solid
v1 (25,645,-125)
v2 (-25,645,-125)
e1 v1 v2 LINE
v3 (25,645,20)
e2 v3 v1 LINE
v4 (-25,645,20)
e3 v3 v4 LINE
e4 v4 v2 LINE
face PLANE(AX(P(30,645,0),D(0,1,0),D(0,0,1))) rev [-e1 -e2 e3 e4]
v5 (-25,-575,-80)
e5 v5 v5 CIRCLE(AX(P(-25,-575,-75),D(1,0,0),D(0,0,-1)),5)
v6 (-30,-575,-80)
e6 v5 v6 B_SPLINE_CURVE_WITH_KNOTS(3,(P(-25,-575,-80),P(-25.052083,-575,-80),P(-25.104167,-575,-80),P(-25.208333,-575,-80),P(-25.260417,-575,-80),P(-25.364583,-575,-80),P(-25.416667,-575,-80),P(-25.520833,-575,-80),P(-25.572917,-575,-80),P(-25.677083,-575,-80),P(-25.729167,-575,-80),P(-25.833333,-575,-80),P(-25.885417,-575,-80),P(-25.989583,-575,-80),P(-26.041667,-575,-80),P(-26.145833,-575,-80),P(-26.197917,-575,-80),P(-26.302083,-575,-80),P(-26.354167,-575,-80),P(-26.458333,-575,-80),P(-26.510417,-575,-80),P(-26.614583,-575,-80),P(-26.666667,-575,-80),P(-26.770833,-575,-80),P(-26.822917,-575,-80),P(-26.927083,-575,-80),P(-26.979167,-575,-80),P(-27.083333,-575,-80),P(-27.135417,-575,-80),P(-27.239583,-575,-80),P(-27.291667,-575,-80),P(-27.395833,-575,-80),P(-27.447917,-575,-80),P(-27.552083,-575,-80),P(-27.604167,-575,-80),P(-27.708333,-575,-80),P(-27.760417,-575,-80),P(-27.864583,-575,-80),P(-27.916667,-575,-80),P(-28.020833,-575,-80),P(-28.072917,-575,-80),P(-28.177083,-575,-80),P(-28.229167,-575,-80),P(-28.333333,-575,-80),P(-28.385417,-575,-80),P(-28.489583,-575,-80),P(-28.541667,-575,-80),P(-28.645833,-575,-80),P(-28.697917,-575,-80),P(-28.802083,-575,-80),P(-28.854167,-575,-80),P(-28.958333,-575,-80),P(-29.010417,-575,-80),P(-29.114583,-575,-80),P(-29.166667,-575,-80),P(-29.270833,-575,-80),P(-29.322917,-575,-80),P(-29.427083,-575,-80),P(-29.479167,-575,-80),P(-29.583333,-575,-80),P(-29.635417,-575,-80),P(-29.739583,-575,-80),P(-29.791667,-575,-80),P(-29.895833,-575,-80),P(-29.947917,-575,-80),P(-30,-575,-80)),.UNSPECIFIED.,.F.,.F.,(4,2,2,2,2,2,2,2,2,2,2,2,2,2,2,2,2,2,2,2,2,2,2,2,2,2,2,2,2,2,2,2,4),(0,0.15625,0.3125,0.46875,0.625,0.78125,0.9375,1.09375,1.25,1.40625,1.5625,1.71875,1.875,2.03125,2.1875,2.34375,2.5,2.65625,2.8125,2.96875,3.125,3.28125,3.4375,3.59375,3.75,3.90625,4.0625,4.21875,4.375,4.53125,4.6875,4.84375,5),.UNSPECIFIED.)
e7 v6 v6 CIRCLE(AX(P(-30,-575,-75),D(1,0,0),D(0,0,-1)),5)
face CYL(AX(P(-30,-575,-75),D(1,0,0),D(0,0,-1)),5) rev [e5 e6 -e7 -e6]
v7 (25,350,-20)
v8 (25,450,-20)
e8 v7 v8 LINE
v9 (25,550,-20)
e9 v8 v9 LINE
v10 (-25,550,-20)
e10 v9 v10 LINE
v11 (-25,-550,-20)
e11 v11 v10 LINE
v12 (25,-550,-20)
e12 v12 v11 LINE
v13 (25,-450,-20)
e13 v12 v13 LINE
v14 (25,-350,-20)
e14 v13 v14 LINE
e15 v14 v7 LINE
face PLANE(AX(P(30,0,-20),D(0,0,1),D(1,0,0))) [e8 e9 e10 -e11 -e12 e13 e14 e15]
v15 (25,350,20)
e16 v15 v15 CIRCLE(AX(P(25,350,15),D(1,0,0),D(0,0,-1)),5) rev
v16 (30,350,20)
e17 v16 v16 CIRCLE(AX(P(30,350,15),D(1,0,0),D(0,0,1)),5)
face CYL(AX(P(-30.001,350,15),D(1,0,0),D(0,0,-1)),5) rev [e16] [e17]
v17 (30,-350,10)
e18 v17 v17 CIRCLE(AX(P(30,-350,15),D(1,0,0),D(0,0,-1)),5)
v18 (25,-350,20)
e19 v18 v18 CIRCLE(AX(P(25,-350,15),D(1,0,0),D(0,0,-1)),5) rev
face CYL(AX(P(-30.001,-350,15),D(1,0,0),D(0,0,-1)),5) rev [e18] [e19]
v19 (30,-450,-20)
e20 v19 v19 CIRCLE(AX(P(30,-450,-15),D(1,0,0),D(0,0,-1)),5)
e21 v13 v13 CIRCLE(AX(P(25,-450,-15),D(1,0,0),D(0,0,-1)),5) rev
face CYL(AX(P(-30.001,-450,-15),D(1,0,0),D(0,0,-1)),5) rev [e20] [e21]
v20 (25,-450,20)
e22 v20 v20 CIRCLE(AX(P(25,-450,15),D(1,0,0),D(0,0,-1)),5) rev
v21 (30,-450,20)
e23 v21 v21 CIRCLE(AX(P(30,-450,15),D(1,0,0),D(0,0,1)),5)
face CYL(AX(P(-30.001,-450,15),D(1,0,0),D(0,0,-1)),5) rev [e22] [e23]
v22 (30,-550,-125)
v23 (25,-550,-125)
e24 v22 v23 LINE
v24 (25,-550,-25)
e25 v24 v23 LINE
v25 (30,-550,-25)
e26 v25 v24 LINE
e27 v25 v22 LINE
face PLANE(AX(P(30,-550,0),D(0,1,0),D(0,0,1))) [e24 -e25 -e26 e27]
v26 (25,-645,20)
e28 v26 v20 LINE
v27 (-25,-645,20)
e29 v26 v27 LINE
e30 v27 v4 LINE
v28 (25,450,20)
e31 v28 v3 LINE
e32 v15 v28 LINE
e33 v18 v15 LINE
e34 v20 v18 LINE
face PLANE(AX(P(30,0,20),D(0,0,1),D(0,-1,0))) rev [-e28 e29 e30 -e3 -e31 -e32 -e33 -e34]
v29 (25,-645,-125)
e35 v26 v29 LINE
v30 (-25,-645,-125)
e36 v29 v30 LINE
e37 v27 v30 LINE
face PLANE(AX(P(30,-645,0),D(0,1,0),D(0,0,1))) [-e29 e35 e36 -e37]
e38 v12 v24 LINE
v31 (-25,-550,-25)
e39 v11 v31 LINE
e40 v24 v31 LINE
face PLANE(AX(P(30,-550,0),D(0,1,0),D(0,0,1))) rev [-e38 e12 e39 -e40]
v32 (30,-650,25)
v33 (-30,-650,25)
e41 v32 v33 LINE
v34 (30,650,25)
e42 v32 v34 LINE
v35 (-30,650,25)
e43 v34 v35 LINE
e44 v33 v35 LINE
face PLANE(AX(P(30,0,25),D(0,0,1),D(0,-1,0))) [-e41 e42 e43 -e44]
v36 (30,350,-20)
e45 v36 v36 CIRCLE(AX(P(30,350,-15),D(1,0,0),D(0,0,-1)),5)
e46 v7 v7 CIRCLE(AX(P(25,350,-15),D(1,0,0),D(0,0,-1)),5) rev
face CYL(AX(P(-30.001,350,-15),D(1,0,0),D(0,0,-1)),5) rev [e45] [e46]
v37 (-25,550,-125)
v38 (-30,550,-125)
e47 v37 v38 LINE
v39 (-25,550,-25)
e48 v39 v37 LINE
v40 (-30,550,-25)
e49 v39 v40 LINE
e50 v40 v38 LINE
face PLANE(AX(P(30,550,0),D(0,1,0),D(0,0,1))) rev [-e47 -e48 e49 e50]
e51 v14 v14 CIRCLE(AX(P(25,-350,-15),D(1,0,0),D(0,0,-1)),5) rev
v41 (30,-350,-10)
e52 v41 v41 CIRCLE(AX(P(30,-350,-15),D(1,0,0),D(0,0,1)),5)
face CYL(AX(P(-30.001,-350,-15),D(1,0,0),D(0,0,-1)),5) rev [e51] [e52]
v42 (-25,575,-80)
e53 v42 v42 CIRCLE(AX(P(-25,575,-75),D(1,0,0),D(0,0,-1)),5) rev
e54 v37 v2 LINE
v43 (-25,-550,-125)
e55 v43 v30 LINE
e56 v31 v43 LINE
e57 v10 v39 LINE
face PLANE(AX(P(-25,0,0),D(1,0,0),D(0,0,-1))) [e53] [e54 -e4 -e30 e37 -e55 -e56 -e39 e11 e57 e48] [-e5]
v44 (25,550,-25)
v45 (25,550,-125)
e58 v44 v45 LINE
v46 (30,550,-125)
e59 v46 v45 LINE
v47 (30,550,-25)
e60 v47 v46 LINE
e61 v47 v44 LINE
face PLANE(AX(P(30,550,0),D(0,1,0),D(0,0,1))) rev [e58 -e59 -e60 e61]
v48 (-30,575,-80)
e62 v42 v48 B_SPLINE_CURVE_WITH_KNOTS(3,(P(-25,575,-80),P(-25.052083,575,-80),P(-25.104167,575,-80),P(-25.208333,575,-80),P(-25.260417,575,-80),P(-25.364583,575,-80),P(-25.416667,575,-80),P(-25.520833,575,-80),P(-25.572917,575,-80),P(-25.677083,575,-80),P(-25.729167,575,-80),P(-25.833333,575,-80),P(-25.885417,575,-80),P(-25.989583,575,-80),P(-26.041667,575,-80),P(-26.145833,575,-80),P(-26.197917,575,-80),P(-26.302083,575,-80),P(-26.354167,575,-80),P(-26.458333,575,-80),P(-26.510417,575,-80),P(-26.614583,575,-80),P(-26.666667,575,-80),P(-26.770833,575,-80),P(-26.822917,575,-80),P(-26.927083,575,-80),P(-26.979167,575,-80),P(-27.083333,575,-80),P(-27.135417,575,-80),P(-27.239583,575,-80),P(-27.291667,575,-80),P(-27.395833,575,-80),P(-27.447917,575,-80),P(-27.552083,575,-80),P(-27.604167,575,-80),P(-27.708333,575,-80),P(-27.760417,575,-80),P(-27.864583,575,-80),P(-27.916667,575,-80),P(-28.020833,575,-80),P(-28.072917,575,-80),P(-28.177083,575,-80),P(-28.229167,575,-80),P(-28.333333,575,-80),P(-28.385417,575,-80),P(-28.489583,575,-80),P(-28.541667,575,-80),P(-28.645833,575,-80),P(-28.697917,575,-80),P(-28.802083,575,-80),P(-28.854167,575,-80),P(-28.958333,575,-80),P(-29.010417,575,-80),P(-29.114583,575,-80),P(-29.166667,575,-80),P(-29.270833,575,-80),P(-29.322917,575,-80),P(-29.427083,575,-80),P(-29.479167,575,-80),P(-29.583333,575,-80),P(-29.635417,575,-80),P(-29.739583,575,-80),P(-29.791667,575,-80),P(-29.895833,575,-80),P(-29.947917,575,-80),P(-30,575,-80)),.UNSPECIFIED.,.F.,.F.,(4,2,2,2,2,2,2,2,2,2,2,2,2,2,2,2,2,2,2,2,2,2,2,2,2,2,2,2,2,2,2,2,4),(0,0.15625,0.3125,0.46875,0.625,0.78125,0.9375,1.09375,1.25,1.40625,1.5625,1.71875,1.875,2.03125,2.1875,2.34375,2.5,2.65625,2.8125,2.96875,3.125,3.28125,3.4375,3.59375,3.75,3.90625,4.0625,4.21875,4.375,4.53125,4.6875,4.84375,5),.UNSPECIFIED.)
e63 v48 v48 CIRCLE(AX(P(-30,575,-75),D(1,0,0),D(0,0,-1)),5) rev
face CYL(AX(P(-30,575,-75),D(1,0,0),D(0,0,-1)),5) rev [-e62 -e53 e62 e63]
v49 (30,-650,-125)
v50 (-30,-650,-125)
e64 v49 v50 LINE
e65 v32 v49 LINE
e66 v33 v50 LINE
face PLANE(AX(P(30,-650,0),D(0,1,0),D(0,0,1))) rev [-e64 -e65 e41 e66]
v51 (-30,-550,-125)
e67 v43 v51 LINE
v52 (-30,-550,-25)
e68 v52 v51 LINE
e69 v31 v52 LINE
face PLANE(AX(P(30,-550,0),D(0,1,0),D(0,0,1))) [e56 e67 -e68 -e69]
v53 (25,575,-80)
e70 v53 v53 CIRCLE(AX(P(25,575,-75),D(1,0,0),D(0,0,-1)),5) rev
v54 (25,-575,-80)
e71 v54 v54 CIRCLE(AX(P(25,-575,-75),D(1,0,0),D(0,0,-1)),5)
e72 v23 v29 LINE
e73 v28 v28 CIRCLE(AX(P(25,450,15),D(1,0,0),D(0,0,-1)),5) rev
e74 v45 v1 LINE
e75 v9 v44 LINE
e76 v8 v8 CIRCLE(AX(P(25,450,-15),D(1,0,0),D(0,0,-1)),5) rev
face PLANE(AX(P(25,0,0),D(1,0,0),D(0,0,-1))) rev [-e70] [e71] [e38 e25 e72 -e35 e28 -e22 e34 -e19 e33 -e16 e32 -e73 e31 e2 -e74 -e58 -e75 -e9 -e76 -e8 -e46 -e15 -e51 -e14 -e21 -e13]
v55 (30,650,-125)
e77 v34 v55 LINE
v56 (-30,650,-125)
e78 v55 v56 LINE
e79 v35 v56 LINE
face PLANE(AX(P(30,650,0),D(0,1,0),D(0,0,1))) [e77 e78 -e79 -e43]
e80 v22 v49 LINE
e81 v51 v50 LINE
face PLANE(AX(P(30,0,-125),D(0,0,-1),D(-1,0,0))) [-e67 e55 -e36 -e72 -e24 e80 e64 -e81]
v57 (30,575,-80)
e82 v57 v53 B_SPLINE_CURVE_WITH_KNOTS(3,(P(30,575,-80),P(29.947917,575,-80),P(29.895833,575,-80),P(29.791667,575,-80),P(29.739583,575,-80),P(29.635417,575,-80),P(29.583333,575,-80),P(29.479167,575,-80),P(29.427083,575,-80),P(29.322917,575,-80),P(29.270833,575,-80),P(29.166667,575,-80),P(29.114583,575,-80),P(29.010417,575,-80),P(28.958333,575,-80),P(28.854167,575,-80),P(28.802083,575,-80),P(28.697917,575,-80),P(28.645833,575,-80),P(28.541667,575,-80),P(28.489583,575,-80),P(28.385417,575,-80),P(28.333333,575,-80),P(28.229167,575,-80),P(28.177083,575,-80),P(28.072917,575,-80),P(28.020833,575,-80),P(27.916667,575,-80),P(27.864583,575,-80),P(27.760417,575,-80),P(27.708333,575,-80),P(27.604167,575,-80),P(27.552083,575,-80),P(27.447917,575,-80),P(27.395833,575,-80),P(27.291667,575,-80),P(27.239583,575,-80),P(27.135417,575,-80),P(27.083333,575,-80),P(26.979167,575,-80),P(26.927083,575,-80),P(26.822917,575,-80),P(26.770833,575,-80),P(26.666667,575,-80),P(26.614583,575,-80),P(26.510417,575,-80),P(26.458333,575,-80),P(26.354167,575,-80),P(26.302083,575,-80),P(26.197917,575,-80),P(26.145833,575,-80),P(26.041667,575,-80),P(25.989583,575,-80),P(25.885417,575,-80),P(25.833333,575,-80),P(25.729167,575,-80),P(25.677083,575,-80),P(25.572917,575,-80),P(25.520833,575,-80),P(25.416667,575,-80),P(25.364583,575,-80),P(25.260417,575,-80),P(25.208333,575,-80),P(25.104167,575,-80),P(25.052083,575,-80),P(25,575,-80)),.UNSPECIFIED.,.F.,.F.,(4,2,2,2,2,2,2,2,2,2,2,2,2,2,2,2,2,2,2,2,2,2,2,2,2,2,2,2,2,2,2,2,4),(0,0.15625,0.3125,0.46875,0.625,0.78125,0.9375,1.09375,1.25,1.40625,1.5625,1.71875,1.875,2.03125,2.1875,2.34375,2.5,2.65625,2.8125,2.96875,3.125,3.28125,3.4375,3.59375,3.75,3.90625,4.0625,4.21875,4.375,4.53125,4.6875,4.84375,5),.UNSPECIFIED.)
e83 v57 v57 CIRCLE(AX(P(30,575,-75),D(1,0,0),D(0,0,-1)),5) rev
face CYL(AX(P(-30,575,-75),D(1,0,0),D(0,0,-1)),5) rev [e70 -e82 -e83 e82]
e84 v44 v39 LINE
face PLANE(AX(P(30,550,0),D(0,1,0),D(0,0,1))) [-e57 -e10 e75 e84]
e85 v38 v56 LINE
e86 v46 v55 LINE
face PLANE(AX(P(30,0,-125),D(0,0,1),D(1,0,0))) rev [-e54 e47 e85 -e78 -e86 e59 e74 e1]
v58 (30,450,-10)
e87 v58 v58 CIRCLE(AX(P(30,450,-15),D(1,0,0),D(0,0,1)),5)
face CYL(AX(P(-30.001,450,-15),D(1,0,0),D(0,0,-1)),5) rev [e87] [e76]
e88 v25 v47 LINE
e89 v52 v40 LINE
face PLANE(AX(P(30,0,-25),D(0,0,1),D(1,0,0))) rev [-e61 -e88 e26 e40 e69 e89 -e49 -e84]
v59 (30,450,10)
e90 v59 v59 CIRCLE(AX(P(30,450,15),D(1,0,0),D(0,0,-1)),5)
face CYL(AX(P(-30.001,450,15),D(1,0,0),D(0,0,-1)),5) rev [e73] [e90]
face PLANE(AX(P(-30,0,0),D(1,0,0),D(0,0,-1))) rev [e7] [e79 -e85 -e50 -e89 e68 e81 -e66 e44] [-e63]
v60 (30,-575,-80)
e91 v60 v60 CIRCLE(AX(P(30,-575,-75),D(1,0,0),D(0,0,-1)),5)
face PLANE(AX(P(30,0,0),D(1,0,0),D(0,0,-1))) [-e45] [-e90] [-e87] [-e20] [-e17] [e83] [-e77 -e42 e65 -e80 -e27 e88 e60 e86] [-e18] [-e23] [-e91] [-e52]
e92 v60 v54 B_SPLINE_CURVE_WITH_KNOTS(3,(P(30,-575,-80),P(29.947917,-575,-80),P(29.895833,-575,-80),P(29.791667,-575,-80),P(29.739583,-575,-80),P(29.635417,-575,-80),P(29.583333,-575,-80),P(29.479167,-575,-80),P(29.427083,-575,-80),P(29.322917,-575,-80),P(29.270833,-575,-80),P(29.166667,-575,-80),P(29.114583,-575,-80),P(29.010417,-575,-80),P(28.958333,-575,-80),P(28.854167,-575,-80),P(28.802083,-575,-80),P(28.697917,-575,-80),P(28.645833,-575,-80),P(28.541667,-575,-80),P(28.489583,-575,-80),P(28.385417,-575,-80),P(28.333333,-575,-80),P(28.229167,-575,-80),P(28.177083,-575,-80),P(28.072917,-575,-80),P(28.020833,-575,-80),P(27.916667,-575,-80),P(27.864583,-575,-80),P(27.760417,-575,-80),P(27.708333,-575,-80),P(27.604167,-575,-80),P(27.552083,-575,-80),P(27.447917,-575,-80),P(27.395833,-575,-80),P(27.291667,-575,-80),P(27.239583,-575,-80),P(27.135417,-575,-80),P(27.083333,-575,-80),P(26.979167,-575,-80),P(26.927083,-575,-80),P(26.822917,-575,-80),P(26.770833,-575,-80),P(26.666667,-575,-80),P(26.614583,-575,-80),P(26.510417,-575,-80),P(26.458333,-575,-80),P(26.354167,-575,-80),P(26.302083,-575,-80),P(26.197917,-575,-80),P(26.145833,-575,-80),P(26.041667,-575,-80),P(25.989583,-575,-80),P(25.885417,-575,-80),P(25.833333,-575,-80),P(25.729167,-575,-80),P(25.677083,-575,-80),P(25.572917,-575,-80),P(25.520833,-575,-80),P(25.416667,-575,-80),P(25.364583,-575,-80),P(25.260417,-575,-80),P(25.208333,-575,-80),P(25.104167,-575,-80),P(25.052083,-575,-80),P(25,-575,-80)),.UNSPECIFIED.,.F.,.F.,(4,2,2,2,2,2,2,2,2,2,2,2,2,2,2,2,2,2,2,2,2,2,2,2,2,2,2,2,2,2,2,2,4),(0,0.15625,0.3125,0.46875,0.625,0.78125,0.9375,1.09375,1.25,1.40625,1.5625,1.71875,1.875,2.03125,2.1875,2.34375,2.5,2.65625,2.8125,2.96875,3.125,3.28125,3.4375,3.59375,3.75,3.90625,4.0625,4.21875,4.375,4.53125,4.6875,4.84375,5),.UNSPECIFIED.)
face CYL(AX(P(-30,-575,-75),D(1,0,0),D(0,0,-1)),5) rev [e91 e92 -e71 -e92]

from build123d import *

# Parameters (mm, degrees)
BOSS_EXTRUDE1_DEPTH = 30
SHELL1_START        = -645
SHELL1_OUTLINE_W    = 50
SHELL1_OUTLINE_H    = 40
SHELL1_DEPTH        = 1290
SHELL1_2_OUTLINE_W  = 50
SHELL1_2_OUTLINE_H  = 105
SHELL1_2_DEPTH      = 95
SHELL1_START_2      = 550
SHELL1_3_OUTLINE_W  = 50
SHELL1_3_OUTLINE_H  = 105
SHELL1_3_DEPTH      = 95
SKETCH2_R           = 5
CUT_EXTRUDE1_DEPTH  = 665.623953827
CUT_EXTRUDE2_REACH  = 666.624
SKETCH3_R           = 5


# Read off the part's stored shape, not the designer's step: Shell1
with BuildPart() as part:
    # Sketch1 → Boss-Extrude1 (new, symmetric)
    with BuildSketch(Plane.YZ):
        Polygon((-550, -25), (550, -25), (550, -125), (650, -125), (650, 25), (550, 25), (-550, 25), (-650, 25), (-650, -125), (-550, -125), align=None)
    extrude(amount=BOSS_EXTRUDE1_DEPTH, both=True)

    # Shell1 outline → Shell1 (cut)
    with BuildSketch(Plane(origin=(0, 0, 0), x_dir=(1, 0, 0), z_dir=(0, 1, 0)).offset(SHELL1_START)):
        Rectangle(SHELL1_OUTLINE_W, SHELL1_OUTLINE_H)
    extrude(amount=SHELL1_DEPTH, mode=Mode.SUBTRACT)

    # Shell1 2 outline → Shell1 2 (cut)
    with BuildSketch(Plane(origin=(0, 0, 0), x_dir=(1, 0, 0), z_dir=(0, 1, 0)).offset(SHELL1_START)):
        with Locations((0, 72.5)):
            Rectangle(SHELL1_2_OUTLINE_W, SHELL1_2_OUTLINE_H)
    extrude(amount=SHELL1_2_DEPTH, mode=Mode.SUBTRACT)

    # Shell1 3 outline → Shell1 3 (cut)
    with BuildSketch(Plane(origin=(0, 0, 0), x_dir=(1, 0, 0), z_dir=(0, 1, 0)).offset(SHELL1_START_2)):
        with Locations((0, 72.5)):
            Rectangle(SHELL1_3_OUTLINE_W, SHELL1_3_OUTLINE_H)
    extrude(amount=SHELL1_3_DEPTH, mode=Mode.SUBTRACT)

    # Sketch2 → Cut-Extrude1 (cut, through all)
    with BuildSketch(Plane.YZ.offset(30)):
        with Locations(Location((-575, -75, 0), (0, 0, 270))):
            Circle(SKETCH2_R)
        with Locations(Location((575, -75, 0), (0, 0, 270))):
            Circle(SKETCH2_R)
    extrude(amount=-CUT_EXTRUDE1_DEPTH, mode=Mode.SUBTRACT)

    # Sketch3 → Cut-Extrude2 (cut, up to next)
    with BuildSketch(Plane.YZ.offset(30), mode=Mode.PRIVATE) as cut_extrude2_sk1:
        with Locations(Location((-350, 15, 0), (0, 0, 270))):
            Circle(SKETCH3_R)
    cut_extrude2_tool1 = extrude(cut_extrude2_sk1.sketch, amount=-CUT_EXTRUDE2_REACH, mode=Mode.PRIVATE) & part.part
    # Sketch3 → Cut-Extrude2 (cut, up to next)
    with BuildSketch(Plane.YZ.offset(30), mode=Mode.PRIVATE) as cut_extrude2_sk2:
        with Locations(Location((-350, -15, 0), (0, 0, 270))):
            Circle(SKETCH3_R)
    cut_extrude2_tool2 = extrude(cut_extrude2_sk2.sketch, amount=-CUT_EXTRUDE2_REACH, mode=Mode.PRIVATE) & part.part
    # Sketch3 → Cut-Extrude2 (cut, up to next)
    with BuildSketch(Plane.YZ.offset(30), mode=Mode.PRIVATE) as cut_extrude2_sk3:
        with Locations(Location((-450, 15, 0), (0, 0, 90))):
            Circle(SKETCH3_R)
    cut_extrude2_tool3 = extrude(cut_extrude2_sk3.sketch, amount=-CUT_EXTRUDE2_REACH, mode=Mode.PRIVATE) & part.part
    # Sketch3 → Cut-Extrude2 (cut, up to next)
    with BuildSketch(Plane.YZ.offset(30), mode=Mode.PRIVATE) as cut_extrude2_sk4:
        with Locations(Location((-450, -15, 0), (0, 0, 270))):
            Circle(SKETCH3_R)
    cut_extrude2_tool4 = extrude(cut_extrude2_sk4.sketch, amount=-CUT_EXTRUDE2_REACH, mode=Mode.PRIVATE) & part.part
    # Sketch3 → Cut-Extrude2 (cut, up to next)
    with BuildSketch(Plane.YZ.offset(30), mode=Mode.PRIVATE) as cut_extrude2_sk5:
        with Locations(Location((450, -15, 0), (0, 0, 270))):
            Circle(SKETCH3_R)
    cut_extrude2_tool5 = extrude(cut_extrude2_sk5.sketch, amount=-CUT_EXTRUDE2_REACH, mode=Mode.PRIVATE) & part.part
    # Sketch3 → Cut-Extrude2 (cut, up to next)
    with BuildSketch(Plane.YZ.offset(30), mode=Mode.PRIVATE) as cut_extrude2_sk6:
        with Locations(Location((450, 15, 0), (0, 0, 270))):
            Circle(SKETCH3_R)
    cut_extrude2_tool6 = extrude(cut_extrude2_sk6.sketch, amount=-CUT_EXTRUDE2_REACH, mode=Mode.PRIVATE) & part.part
    # Sketch3 → Cut-Extrude2 (cut, up to next)
    with BuildSketch(Plane.YZ.offset(30), mode=Mode.PRIVATE) as cut_extrude2_sk7:
        with Locations(Location((350, -15, 0), (0, 0, 270))):
            Circle(SKETCH3_R)
    cut_extrude2_tool7 = extrude(cut_extrude2_sk7.sketch, amount=-CUT_EXTRUDE2_REACH, mode=Mode.PRIVATE) & part.part
    # Sketch3 → Cut-Extrude2 (cut, up to next)
    with BuildSketch(Plane.YZ.offset(30), mode=Mode.PRIVATE) as cut_extrude2_sk8:
        with Locations(Location((350, 15, 0), (0, 0, 90))):
            Circle(SKETCH3_R)
    cut_extrude2_tool8 = extrude(cut_extrude2_sk8.sketch, amount=-CUT_EXTRUDE2_REACH, mode=Mode.PRIVATE) & part.part
    add(cut_extrude2_tool1.solids().sort_by_distance((30, -350, 15))[0], mode=Mode.SUBTRACT)
    add(cut_extrude2_tool2.solids().sort_by_distance((30, -350, -15))[0], mode=Mode.SUBTRACT)
    add(cut_extrude2_tool3.solids().sort_by_distance((30, -450, 15))[0], mode=Mode.SUBTRACT)
    add(cut_extrude2_tool4.solids().sort_by_distance((30, -450, -15))[0], mode=Mode.SUBTRACT)
    add(cut_extrude2_tool5.solids().sort_by_distance((30, 450, -15))[0], mode=Mode.SUBTRACT)
    add(cut_extrude2_tool6.solids().sort_by_distance((30, 450, 15))[0], mode=Mode.SUBTRACT)
    add(cut_extrude2_tool7.solids().sort_by_distance((30, 350, -15))[0], mode=Mode.SUBTRACT)
    add(cut_extrude2_tool8.solids().sort_by_distance((30, 350, 15))[0], mode=Mode.SUBTRACT)


solid = part.part
